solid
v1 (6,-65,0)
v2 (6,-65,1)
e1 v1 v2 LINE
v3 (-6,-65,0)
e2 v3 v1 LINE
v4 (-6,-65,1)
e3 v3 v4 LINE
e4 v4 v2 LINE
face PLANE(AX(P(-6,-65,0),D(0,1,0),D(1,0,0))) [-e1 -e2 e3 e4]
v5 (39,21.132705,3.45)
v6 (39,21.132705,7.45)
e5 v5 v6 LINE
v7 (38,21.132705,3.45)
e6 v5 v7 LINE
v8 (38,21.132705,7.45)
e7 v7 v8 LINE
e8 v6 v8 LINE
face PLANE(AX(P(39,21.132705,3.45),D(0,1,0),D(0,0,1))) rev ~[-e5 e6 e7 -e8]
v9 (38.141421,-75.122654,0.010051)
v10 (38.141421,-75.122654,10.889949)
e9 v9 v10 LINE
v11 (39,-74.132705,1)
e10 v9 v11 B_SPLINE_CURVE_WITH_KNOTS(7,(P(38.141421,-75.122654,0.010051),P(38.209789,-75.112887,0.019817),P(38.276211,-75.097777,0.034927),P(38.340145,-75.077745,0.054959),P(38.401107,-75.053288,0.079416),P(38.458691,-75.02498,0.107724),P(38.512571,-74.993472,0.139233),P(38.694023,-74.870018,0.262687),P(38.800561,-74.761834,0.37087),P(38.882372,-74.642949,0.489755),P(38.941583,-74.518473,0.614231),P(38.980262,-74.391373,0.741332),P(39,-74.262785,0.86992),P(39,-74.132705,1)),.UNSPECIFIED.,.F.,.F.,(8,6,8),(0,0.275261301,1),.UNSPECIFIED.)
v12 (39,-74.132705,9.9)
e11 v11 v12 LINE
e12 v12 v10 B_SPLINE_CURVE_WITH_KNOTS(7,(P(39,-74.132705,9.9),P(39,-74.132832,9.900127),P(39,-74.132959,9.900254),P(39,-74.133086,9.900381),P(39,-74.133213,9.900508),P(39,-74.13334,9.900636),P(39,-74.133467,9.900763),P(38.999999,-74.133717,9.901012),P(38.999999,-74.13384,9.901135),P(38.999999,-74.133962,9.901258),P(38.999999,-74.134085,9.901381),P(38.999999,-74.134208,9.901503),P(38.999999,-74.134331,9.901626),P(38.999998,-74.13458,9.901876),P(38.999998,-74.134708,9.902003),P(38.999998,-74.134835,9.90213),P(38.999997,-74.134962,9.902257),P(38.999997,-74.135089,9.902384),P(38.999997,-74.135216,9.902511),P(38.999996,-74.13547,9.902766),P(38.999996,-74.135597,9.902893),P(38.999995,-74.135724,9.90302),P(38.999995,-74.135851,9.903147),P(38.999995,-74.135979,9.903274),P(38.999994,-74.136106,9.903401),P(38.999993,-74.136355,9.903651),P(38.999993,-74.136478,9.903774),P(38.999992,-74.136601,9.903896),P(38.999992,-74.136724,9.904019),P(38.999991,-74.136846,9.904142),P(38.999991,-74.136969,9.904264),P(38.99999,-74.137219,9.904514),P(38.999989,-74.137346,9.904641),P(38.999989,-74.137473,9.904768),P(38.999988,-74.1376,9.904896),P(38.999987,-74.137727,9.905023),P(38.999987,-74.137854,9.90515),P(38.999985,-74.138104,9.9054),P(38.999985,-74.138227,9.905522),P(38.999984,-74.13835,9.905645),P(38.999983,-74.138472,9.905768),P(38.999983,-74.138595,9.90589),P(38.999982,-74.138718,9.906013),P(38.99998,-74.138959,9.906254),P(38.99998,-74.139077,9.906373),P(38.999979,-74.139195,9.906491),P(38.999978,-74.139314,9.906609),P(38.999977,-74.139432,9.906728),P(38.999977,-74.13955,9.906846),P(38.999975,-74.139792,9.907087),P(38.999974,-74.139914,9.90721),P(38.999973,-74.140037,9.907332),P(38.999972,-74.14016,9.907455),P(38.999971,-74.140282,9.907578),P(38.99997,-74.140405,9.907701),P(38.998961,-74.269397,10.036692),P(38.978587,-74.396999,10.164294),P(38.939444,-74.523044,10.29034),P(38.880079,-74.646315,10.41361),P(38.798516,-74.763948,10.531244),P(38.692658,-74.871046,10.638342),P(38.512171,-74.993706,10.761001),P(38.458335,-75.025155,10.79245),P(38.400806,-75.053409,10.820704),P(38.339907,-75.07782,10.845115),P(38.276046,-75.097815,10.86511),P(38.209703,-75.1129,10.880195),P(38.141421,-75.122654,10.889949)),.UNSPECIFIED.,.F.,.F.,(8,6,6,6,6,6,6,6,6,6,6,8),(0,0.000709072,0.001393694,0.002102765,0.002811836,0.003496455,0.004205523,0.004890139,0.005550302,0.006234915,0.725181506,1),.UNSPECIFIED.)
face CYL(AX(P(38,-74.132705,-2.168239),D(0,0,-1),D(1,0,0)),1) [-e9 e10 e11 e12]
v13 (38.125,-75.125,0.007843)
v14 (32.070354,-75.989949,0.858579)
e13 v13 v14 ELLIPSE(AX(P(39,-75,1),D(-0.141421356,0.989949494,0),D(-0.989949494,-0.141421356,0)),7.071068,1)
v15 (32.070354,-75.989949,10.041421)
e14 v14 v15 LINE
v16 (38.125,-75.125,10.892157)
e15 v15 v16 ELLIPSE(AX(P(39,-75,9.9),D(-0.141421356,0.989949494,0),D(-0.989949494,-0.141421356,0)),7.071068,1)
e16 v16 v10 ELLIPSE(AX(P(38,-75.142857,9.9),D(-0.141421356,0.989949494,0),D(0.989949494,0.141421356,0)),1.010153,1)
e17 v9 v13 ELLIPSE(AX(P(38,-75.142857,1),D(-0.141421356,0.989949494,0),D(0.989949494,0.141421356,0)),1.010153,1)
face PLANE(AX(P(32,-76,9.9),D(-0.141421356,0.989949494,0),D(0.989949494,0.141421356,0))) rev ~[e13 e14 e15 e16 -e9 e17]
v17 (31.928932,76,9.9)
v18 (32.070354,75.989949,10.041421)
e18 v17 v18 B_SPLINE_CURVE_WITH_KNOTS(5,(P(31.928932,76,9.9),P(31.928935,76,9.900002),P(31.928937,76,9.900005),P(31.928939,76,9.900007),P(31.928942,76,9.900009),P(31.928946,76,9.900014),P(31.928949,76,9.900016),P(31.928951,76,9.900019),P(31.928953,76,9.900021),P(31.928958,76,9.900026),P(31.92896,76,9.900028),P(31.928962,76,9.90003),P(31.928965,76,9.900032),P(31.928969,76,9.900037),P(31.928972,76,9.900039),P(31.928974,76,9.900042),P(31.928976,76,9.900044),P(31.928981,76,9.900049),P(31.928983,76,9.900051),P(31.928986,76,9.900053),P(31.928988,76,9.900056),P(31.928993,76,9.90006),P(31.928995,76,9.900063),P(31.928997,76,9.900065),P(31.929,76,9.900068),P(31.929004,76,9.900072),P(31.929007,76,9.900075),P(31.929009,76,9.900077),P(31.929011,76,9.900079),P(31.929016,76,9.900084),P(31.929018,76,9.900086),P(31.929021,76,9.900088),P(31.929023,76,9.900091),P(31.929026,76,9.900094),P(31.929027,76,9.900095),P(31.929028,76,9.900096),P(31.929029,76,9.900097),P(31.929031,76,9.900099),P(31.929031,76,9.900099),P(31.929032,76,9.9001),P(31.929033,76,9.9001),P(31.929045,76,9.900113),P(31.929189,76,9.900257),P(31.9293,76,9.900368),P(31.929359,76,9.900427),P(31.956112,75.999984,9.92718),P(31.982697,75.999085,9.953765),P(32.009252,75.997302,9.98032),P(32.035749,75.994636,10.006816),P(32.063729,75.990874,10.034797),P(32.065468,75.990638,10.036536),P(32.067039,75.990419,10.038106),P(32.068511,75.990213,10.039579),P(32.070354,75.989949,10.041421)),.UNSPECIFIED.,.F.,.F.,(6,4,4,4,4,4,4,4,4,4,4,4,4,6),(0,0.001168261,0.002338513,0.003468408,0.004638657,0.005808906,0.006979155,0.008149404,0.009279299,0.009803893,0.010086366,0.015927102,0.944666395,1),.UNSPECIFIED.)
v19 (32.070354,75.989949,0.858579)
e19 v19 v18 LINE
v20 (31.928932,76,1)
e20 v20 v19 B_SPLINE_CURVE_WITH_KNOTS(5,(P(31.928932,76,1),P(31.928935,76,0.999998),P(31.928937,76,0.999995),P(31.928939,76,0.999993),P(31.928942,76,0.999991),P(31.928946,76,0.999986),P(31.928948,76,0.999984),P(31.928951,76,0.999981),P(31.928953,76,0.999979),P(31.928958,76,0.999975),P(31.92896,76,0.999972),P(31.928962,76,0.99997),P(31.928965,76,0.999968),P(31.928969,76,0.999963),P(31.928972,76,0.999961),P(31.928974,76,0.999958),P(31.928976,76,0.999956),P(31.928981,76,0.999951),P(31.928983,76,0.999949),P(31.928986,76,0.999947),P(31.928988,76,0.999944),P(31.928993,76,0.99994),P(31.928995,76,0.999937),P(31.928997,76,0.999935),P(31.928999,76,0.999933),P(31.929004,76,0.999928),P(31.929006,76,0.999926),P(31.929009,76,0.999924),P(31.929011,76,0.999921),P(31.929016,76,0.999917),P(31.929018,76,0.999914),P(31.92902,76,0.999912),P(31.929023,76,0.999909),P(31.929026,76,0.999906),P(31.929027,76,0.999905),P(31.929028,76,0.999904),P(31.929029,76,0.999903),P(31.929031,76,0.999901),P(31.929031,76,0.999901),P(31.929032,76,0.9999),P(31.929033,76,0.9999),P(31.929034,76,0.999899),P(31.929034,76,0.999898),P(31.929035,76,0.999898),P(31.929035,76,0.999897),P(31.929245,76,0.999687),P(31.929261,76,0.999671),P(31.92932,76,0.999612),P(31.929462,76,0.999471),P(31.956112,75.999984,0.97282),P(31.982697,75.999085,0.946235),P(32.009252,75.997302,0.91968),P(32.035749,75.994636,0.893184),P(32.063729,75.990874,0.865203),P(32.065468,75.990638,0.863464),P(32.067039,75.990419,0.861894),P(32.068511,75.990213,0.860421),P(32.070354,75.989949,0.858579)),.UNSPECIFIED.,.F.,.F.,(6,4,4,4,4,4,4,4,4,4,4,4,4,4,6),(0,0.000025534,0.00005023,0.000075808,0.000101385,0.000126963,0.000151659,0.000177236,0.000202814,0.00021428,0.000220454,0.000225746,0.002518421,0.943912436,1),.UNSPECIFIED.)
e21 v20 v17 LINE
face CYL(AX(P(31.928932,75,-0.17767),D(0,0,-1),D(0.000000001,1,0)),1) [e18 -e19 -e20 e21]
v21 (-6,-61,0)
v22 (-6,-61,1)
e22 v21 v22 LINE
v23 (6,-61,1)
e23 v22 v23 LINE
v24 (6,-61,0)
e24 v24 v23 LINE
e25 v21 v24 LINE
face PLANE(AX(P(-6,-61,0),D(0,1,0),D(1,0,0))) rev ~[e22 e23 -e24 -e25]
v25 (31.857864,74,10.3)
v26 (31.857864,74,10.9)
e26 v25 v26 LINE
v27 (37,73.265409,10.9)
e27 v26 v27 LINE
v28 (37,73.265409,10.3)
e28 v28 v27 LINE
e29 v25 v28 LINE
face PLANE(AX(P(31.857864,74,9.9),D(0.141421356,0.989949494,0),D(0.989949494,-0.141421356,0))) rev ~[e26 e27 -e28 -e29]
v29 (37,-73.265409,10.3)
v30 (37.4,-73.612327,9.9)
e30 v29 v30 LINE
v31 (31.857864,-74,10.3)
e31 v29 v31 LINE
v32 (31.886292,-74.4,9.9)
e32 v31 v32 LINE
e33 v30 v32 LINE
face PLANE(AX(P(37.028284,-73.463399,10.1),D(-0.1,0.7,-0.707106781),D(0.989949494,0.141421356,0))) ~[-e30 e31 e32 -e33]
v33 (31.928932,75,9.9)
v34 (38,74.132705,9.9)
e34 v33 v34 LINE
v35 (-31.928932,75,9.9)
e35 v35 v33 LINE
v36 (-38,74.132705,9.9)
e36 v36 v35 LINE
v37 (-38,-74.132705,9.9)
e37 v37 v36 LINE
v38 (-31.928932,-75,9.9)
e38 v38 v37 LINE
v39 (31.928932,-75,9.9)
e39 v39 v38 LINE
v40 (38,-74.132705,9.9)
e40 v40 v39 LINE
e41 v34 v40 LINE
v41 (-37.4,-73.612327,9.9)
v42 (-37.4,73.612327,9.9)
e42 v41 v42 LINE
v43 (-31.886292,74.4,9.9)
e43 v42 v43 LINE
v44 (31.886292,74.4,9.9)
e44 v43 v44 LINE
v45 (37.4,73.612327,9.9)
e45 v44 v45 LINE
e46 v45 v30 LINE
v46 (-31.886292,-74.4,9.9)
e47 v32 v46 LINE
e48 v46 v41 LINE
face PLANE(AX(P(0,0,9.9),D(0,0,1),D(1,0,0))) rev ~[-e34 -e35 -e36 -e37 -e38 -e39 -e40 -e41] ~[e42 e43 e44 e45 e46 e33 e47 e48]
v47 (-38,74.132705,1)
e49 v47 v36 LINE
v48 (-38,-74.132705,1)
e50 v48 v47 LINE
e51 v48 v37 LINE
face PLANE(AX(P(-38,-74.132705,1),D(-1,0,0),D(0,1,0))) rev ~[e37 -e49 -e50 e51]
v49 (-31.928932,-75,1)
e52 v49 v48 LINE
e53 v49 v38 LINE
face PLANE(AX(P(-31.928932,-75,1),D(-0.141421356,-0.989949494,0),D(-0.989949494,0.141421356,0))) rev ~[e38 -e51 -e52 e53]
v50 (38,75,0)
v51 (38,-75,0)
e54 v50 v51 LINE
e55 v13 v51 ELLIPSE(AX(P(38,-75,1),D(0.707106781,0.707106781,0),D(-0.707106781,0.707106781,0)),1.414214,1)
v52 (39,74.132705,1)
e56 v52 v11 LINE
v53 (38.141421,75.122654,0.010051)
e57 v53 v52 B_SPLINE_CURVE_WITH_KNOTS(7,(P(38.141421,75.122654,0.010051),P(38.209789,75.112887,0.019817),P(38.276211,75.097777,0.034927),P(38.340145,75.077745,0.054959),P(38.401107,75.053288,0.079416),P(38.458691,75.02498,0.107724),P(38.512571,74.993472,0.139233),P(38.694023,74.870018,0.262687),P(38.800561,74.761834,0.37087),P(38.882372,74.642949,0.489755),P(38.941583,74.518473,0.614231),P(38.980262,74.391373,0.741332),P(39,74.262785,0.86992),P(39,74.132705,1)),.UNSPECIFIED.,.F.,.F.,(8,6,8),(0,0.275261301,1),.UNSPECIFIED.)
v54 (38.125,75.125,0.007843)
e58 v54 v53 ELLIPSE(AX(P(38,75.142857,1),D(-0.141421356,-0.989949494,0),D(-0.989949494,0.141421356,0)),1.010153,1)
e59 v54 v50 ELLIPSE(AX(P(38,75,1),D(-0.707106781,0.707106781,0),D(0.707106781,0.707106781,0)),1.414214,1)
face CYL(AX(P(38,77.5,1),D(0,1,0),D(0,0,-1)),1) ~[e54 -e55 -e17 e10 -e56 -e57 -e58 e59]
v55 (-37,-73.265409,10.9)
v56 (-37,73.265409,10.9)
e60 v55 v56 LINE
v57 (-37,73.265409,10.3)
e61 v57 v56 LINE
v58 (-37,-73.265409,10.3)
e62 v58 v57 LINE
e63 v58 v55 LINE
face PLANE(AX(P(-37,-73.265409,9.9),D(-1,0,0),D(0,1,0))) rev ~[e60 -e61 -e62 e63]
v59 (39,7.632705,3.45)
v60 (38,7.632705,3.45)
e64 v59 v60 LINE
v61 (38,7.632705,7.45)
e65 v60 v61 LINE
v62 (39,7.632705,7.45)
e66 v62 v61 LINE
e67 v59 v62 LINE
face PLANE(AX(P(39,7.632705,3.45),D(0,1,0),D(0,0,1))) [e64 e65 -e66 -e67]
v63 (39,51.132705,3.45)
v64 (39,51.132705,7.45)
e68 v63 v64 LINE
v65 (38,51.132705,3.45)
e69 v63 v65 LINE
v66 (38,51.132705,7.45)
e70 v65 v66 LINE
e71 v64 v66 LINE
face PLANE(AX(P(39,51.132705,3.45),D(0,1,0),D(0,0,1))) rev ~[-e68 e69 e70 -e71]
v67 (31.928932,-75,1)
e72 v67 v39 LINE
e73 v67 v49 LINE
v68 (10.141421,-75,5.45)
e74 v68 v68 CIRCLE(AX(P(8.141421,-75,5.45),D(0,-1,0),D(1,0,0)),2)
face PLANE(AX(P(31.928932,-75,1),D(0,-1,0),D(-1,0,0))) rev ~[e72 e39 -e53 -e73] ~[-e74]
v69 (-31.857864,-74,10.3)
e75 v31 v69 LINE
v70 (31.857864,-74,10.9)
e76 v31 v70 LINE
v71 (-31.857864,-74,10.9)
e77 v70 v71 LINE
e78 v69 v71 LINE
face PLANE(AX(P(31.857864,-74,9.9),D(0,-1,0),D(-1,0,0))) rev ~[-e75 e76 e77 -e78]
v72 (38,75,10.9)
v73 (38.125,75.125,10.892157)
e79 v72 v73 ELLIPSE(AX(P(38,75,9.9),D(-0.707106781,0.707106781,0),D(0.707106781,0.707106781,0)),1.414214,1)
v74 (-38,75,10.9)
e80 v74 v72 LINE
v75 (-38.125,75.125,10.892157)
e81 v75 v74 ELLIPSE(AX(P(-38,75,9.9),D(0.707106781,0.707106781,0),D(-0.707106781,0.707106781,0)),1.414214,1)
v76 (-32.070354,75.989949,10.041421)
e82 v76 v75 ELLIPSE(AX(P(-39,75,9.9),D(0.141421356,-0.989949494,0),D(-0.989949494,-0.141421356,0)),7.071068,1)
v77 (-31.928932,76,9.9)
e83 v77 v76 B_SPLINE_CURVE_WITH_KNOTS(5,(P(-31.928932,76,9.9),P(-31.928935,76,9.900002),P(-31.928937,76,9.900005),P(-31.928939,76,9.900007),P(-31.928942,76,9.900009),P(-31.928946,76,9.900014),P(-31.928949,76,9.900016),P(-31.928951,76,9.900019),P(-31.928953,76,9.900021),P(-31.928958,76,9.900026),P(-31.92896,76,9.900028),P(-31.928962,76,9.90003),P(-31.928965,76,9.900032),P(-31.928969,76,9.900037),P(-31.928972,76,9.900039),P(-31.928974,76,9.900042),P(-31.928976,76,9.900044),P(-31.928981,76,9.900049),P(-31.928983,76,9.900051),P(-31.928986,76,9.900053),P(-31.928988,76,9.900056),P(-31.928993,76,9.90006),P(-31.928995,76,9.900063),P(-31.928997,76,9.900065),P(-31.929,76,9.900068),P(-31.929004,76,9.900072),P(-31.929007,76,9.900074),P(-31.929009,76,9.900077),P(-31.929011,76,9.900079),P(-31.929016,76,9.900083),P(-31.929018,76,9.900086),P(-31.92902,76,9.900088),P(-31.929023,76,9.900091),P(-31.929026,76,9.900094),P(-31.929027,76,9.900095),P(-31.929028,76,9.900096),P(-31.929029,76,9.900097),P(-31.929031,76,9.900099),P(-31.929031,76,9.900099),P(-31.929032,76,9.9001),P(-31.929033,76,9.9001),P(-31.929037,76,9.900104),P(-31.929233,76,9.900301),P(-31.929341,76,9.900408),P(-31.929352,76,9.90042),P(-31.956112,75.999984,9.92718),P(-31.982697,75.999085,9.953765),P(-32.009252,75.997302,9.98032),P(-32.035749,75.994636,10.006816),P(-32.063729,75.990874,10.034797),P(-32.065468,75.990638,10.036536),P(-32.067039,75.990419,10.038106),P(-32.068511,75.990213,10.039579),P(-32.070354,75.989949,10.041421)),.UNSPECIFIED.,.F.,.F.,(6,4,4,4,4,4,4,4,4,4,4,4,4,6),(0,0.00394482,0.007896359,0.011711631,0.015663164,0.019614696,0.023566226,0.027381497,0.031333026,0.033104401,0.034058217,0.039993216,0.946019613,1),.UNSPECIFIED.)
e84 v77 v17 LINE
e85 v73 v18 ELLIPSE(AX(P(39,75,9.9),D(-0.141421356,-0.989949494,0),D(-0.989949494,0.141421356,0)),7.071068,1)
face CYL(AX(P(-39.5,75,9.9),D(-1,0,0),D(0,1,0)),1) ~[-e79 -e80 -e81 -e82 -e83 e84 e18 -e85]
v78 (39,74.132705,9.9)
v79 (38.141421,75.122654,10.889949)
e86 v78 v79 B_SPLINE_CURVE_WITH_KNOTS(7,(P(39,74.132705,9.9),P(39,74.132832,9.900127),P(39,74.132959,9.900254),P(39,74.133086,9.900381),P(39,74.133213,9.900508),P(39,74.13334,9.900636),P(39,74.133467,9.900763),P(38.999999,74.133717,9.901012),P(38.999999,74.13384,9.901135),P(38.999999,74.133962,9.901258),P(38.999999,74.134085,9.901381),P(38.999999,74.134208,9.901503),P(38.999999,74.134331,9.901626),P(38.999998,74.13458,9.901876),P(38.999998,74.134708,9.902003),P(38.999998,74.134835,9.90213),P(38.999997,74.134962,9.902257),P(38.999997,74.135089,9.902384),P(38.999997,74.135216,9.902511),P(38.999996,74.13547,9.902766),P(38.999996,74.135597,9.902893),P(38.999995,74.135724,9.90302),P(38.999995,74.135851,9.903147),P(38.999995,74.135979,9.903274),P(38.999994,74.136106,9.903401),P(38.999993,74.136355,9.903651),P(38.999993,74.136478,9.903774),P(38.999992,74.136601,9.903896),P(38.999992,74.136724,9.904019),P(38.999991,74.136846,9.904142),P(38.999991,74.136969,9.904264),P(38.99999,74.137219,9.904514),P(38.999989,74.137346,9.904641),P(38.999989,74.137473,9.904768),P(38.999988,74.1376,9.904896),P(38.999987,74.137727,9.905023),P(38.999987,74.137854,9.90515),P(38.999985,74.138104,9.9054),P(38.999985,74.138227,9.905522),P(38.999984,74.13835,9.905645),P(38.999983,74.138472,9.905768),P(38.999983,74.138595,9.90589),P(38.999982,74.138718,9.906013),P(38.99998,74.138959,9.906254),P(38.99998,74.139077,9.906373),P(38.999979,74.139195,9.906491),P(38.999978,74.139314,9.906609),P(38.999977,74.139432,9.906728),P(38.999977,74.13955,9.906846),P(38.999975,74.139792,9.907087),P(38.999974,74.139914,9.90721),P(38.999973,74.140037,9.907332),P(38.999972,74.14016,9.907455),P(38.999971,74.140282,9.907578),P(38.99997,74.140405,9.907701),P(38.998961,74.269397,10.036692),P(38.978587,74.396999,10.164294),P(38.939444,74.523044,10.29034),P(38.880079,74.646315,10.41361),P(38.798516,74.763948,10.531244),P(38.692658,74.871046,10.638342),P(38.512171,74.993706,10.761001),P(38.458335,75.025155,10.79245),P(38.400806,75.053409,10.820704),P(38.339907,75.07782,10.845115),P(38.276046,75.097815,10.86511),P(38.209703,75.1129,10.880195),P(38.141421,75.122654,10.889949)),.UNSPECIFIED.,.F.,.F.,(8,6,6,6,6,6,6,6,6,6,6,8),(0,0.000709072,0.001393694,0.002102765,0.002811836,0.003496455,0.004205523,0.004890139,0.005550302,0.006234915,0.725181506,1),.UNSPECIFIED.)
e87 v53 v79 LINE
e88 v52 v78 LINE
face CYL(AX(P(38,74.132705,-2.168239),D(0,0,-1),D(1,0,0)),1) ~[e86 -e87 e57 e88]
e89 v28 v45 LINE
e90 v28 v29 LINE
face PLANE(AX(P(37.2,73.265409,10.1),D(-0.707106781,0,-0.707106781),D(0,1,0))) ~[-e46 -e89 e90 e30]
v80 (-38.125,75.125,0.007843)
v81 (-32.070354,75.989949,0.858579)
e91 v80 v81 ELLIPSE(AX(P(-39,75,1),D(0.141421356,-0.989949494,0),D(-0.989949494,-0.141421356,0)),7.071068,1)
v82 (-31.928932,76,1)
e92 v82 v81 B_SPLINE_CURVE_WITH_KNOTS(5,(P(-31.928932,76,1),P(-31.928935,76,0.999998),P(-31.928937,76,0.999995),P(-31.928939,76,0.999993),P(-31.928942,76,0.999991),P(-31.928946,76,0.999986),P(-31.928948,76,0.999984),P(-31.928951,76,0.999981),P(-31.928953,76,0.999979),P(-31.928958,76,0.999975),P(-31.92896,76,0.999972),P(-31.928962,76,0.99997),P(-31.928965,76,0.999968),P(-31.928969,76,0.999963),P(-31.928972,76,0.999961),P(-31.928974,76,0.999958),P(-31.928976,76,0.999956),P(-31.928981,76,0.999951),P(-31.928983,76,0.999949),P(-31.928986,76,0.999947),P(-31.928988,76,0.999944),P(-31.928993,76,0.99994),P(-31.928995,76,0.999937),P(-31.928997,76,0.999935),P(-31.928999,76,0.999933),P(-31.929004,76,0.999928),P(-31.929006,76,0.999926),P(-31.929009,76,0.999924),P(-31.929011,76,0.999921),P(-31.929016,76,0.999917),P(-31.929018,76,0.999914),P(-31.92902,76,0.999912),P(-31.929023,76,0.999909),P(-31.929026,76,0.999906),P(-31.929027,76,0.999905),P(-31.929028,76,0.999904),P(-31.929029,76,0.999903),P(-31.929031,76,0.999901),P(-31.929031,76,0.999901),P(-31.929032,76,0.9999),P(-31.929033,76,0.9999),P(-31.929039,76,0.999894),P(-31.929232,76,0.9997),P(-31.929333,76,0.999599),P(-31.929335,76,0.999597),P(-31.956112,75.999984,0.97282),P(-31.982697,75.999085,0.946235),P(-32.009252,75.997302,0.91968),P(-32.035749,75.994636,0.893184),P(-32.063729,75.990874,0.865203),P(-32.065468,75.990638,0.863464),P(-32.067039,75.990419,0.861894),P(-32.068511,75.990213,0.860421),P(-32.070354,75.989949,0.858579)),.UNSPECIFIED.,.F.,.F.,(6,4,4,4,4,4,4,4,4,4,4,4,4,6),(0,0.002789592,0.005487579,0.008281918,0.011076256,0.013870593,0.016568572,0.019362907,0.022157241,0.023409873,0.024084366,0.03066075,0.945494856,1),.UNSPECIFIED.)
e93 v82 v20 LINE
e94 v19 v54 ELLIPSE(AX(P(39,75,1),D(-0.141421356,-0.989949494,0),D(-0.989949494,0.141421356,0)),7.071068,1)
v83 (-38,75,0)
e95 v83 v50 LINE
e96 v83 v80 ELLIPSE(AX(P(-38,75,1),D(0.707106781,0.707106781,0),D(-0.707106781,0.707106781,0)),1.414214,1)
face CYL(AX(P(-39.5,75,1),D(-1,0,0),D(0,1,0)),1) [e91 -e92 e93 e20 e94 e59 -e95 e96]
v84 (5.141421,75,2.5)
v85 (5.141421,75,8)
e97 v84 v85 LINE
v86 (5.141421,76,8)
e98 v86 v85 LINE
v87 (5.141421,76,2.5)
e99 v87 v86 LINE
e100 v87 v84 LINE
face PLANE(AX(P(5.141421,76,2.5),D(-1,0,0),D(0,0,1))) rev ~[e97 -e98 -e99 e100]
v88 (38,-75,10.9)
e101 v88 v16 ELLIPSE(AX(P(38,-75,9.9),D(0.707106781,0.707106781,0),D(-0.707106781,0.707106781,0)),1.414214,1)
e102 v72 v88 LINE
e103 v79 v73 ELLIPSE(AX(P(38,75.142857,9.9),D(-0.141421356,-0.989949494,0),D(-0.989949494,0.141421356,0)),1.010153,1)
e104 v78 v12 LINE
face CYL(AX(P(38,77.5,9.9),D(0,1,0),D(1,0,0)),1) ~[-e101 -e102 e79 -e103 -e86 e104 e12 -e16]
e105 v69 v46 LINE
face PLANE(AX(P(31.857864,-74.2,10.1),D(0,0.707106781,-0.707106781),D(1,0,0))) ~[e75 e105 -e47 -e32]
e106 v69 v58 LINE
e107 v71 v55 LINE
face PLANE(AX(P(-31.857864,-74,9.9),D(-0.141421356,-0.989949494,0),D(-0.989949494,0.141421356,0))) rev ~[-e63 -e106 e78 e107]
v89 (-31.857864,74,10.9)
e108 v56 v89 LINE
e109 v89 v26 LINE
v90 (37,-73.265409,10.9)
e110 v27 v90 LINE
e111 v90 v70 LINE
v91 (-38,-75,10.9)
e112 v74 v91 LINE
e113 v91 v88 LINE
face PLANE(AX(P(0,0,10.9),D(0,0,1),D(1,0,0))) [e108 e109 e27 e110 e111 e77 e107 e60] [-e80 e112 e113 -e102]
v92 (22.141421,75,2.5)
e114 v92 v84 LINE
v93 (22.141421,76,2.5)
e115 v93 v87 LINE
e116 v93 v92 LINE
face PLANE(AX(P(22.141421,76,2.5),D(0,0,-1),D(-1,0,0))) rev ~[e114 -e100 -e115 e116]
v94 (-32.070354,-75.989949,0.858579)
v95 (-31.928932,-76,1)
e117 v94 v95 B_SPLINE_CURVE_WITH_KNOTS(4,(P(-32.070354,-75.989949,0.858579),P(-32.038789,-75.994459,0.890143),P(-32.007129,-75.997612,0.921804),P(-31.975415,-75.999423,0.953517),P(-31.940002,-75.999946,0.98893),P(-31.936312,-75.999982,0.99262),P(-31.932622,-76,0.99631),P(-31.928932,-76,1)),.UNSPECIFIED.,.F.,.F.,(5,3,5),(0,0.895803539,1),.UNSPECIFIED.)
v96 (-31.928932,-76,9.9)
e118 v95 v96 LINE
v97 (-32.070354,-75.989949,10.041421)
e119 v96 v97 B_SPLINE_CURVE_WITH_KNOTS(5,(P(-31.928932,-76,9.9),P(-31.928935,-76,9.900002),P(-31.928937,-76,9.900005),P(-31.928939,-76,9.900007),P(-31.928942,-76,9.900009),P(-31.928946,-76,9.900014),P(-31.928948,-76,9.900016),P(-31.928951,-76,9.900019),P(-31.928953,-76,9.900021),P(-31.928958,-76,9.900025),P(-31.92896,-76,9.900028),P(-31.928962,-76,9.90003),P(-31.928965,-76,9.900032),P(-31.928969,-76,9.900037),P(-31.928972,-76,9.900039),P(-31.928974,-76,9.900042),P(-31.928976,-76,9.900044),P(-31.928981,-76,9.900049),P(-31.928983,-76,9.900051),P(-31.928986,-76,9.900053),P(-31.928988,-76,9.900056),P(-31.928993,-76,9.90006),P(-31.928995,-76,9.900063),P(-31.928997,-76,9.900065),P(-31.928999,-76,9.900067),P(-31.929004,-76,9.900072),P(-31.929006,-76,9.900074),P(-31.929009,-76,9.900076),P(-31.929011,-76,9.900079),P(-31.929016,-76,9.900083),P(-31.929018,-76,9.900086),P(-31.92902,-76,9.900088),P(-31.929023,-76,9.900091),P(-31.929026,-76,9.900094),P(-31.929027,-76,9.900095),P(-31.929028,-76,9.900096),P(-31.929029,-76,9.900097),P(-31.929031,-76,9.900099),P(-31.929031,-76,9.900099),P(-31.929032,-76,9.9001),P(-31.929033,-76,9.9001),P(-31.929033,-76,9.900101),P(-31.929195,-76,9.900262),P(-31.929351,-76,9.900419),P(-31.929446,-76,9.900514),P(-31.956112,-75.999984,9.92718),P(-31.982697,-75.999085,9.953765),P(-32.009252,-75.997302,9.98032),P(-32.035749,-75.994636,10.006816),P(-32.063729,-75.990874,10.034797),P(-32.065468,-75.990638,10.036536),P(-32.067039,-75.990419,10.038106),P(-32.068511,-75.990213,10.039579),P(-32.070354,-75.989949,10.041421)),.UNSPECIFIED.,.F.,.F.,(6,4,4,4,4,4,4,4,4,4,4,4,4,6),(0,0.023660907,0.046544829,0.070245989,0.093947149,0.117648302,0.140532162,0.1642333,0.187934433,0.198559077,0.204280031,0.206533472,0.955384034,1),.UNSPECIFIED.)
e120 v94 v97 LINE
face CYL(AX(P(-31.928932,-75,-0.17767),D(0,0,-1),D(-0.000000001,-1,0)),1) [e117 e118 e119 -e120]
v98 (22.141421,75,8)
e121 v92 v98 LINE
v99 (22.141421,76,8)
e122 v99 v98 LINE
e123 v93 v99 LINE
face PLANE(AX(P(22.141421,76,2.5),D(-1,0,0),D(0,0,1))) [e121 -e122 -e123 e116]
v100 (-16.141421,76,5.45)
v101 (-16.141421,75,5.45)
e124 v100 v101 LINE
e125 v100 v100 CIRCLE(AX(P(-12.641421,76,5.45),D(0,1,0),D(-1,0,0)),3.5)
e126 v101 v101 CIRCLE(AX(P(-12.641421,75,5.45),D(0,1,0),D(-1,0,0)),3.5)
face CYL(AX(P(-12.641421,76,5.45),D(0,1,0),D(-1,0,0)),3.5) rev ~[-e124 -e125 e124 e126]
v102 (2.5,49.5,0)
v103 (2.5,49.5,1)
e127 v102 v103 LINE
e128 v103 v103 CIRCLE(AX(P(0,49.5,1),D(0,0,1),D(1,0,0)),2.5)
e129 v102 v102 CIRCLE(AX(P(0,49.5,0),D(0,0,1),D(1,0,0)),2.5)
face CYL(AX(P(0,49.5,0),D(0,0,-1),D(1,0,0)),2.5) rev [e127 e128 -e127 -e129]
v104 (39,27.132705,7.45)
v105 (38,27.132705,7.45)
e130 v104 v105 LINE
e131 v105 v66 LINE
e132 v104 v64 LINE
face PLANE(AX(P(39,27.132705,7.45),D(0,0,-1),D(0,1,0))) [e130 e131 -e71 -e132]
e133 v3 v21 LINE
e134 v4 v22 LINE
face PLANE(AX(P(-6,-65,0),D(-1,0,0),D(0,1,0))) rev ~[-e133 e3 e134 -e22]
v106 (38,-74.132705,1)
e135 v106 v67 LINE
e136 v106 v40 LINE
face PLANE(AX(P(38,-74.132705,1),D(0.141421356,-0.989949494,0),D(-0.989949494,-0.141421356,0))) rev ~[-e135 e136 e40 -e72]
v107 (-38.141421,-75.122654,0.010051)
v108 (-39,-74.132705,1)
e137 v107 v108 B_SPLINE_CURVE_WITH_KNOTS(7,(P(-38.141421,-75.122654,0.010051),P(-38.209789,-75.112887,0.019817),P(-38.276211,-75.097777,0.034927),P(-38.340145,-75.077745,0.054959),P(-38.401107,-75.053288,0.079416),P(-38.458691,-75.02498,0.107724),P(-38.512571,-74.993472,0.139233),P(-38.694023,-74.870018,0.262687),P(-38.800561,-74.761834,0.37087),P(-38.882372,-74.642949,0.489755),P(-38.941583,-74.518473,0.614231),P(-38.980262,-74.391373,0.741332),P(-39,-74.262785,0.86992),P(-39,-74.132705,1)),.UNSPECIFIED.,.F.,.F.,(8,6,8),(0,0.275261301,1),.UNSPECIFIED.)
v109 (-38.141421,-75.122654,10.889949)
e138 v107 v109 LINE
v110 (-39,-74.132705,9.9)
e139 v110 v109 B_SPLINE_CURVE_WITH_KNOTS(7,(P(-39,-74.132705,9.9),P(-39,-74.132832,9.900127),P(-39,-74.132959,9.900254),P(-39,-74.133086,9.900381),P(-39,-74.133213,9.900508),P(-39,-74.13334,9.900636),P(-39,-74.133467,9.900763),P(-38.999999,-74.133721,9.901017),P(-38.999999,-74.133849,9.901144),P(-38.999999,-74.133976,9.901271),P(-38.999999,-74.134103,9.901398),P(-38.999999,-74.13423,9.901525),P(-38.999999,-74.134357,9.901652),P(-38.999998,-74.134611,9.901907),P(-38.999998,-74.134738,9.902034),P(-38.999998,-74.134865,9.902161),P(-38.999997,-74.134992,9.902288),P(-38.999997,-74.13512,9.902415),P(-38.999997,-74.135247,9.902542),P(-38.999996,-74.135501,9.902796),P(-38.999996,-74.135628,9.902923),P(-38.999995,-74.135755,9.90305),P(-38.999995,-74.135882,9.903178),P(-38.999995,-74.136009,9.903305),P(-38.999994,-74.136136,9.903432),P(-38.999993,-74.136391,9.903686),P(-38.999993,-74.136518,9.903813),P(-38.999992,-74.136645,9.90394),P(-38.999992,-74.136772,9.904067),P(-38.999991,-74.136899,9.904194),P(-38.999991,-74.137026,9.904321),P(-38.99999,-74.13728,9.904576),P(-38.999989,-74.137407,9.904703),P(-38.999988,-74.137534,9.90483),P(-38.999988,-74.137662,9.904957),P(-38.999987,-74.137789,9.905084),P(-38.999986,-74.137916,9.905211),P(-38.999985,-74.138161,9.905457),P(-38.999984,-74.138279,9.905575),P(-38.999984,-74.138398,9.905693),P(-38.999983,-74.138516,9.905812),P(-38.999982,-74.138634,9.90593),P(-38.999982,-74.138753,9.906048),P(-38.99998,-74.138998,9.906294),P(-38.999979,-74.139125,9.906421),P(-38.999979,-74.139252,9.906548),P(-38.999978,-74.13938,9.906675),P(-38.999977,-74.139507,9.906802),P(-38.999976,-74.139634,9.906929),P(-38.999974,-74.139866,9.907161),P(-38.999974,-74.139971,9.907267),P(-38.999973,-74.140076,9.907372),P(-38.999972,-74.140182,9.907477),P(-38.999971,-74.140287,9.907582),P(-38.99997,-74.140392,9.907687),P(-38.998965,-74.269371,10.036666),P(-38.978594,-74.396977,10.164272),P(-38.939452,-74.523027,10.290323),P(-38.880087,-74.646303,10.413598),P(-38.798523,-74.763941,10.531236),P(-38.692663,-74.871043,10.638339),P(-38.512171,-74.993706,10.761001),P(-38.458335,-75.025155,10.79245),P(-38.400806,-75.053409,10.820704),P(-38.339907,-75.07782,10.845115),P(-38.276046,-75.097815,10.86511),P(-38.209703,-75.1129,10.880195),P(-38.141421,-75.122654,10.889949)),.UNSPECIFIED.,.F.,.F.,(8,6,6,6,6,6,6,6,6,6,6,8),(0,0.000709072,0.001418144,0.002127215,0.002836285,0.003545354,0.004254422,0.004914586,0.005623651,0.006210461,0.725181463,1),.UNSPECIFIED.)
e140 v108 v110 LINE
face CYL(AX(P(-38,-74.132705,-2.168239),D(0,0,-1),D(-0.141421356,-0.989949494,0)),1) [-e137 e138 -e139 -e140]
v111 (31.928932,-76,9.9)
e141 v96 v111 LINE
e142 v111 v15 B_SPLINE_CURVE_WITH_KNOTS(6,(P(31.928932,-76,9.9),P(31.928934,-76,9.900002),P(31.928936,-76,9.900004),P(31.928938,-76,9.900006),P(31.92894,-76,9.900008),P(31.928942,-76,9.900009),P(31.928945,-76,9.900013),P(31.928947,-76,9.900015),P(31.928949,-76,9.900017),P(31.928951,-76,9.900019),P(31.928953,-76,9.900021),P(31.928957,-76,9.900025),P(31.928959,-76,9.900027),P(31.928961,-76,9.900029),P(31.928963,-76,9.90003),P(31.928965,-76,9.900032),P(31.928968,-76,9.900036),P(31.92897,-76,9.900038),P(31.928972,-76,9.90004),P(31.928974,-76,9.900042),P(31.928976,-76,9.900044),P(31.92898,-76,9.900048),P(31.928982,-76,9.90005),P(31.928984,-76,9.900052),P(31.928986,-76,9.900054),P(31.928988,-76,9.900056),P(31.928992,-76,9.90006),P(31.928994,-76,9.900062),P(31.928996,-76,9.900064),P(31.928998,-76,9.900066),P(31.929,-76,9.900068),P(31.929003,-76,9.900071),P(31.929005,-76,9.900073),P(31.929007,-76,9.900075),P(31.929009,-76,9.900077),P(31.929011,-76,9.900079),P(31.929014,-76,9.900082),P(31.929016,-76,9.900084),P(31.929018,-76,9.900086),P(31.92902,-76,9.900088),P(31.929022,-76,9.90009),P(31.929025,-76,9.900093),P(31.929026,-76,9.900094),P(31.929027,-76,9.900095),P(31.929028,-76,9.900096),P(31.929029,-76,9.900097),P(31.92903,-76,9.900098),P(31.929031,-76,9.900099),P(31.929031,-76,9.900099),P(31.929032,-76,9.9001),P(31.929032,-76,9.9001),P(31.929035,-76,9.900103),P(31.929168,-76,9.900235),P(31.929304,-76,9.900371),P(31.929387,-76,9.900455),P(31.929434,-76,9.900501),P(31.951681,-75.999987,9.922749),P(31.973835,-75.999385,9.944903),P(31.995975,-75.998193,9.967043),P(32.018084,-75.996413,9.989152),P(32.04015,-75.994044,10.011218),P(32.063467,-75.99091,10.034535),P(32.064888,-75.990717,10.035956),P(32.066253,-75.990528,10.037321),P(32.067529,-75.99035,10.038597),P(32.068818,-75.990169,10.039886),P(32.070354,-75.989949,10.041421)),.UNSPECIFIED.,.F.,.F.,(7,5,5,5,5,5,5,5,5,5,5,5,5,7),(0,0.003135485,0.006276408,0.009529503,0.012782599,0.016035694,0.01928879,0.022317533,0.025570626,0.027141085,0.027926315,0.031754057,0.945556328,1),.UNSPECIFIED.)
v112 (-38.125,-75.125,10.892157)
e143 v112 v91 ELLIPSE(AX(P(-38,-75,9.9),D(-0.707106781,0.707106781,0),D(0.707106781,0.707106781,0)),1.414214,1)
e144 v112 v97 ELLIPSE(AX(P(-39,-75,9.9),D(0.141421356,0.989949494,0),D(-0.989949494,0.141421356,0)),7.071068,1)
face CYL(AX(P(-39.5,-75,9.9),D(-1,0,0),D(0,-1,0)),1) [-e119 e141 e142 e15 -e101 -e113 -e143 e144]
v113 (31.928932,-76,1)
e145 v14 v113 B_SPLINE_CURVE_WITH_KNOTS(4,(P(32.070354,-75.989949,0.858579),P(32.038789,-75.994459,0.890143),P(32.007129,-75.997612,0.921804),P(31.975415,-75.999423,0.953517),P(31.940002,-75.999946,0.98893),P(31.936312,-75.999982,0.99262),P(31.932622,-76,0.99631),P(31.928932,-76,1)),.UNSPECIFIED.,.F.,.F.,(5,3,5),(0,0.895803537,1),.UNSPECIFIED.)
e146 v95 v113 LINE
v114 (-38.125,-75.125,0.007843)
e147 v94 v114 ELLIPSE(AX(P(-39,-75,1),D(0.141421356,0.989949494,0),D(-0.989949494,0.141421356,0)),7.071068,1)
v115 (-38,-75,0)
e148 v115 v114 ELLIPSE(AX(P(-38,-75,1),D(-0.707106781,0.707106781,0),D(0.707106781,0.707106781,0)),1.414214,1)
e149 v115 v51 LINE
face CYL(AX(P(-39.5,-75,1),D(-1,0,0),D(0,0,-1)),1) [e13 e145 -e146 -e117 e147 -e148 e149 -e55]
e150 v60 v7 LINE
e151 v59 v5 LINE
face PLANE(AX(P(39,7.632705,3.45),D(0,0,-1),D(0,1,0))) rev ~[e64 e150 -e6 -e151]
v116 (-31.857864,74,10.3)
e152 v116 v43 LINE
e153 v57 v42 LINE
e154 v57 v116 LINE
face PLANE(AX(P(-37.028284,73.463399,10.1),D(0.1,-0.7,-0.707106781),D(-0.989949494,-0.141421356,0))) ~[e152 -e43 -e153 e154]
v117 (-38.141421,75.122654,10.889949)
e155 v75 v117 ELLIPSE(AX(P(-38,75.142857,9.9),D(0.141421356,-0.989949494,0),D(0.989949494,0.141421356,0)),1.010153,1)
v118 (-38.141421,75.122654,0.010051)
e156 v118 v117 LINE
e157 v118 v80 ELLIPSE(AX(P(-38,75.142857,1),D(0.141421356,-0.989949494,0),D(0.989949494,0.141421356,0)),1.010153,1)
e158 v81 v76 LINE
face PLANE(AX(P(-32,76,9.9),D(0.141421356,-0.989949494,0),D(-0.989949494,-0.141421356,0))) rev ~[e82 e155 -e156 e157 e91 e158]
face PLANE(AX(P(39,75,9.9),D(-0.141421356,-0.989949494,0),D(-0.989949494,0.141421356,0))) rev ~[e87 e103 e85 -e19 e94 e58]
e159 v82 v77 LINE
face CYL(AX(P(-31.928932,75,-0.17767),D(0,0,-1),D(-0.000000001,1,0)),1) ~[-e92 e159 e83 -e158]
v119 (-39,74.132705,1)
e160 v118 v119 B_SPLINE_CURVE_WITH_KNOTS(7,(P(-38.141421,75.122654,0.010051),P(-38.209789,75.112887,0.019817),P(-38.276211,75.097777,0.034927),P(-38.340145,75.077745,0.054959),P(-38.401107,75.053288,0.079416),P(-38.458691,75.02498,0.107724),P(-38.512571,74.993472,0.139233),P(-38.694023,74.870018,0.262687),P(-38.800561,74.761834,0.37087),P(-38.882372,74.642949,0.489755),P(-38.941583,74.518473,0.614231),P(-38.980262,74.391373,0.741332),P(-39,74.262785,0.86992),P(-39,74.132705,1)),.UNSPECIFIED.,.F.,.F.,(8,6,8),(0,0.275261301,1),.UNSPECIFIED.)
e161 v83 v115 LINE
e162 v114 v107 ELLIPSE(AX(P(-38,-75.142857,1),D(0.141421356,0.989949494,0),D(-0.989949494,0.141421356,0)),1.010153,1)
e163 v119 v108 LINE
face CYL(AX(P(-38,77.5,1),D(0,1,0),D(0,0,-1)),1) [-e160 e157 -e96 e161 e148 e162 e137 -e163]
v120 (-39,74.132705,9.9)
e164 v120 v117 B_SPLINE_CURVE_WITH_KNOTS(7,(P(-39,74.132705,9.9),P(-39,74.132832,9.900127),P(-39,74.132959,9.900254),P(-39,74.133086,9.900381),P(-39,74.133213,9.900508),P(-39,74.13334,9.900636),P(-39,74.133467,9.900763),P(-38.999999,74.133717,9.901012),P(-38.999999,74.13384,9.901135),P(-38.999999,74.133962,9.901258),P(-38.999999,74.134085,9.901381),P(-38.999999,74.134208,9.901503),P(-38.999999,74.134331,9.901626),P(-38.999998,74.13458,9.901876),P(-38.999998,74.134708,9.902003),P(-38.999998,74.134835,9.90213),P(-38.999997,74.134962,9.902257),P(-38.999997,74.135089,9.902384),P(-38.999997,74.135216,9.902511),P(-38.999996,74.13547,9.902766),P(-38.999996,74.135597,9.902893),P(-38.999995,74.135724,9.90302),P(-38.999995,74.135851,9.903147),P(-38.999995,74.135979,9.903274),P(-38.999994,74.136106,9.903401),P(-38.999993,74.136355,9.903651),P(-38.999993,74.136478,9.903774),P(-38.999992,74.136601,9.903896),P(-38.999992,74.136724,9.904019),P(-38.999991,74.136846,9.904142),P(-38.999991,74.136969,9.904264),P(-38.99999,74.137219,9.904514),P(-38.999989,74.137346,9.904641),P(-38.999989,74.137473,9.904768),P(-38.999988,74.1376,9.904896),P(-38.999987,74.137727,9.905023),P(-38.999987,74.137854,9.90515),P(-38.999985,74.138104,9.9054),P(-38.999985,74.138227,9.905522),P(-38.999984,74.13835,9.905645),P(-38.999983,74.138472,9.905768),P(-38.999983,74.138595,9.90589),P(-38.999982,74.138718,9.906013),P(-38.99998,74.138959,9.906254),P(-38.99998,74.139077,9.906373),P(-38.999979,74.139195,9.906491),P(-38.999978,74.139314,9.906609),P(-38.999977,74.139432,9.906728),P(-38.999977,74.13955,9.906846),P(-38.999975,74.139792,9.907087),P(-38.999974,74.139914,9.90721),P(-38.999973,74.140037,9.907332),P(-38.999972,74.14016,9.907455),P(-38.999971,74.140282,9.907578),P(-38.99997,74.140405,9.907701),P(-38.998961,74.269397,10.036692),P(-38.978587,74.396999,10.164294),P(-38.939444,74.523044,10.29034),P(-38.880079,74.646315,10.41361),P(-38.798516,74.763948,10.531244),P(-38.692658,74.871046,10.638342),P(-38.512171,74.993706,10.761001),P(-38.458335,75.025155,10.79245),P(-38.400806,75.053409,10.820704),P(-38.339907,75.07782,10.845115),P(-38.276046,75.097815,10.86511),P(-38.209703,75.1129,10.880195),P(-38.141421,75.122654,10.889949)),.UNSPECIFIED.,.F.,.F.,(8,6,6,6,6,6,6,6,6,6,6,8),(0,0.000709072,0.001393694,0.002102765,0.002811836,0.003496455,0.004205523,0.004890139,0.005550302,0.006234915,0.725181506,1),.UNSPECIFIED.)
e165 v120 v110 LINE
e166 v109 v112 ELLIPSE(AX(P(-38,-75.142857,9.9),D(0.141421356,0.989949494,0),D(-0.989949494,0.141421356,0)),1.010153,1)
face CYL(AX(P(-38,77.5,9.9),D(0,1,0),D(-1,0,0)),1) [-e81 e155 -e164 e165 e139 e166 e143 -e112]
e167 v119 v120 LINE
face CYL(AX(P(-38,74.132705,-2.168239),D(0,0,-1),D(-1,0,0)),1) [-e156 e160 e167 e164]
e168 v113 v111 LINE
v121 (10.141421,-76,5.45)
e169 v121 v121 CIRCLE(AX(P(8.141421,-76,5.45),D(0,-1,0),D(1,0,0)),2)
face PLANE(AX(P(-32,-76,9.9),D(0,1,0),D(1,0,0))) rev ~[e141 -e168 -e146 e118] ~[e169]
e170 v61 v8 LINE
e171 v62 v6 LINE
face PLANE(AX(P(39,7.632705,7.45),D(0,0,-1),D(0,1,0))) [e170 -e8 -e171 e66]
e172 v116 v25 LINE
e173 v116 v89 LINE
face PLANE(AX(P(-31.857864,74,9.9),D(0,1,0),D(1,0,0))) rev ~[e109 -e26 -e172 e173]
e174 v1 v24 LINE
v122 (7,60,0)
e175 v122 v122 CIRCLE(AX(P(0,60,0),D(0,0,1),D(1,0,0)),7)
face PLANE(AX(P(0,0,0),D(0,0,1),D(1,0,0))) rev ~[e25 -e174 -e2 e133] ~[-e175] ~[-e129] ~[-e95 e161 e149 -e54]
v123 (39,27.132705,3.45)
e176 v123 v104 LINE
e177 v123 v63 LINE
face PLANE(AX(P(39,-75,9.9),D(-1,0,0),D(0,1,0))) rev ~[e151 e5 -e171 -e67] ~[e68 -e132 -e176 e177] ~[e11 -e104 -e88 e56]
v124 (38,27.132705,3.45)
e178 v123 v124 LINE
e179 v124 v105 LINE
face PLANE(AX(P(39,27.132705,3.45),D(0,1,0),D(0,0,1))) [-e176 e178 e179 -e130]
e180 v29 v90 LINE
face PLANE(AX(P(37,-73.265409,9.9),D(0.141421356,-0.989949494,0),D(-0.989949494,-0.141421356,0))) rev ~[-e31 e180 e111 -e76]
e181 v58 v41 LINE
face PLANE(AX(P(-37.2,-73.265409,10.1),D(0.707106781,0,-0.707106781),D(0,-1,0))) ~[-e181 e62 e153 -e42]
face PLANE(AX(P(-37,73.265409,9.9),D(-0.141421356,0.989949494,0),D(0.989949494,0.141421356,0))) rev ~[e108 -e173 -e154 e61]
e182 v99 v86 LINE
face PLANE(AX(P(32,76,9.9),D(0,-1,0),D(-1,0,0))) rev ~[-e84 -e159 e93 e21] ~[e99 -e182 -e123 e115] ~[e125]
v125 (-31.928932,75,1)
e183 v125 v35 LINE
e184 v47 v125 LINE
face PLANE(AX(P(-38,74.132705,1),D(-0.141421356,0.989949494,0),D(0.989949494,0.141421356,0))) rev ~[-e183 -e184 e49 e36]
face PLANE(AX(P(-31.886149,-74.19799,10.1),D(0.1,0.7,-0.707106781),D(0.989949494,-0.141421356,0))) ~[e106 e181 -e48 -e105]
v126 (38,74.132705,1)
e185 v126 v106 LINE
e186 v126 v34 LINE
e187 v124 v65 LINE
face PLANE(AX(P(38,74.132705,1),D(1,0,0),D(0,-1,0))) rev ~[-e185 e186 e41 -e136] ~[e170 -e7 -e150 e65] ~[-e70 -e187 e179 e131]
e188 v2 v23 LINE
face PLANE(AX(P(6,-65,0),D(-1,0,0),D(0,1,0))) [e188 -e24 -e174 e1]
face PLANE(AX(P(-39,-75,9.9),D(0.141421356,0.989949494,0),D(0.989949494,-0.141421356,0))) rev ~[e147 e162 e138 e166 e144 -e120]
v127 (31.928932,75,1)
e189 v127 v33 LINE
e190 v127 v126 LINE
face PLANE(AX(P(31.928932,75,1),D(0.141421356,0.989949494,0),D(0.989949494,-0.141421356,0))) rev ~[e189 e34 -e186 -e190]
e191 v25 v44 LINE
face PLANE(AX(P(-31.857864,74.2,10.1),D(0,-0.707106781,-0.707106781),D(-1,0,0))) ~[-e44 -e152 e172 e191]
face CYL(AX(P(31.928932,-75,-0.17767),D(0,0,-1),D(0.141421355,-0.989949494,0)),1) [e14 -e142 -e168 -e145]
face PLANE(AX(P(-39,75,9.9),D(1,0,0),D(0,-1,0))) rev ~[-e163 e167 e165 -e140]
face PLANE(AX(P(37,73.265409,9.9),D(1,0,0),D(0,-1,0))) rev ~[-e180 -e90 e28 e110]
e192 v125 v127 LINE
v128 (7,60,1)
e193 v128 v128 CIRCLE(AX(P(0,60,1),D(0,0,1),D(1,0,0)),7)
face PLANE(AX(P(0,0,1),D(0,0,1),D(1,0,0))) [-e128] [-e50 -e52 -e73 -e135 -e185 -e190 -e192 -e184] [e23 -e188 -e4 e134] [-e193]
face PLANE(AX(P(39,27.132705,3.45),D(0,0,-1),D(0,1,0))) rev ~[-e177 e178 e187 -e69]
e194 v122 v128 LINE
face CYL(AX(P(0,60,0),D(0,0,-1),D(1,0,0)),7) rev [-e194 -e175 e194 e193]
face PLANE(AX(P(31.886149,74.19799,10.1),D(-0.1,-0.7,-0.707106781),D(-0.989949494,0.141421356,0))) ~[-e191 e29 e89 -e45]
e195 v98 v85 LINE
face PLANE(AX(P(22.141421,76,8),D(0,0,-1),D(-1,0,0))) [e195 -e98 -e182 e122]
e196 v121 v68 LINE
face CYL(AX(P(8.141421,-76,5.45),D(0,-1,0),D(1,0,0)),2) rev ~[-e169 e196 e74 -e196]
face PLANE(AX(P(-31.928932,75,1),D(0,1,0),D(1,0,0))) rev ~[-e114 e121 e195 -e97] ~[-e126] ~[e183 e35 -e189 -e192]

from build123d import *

# Parameters (mm, degrees)
F0_W        = 12
F0_H        = 4
F0_R        = 2.5
F0_R_2      = 7
F1_DEPTH    = 1
F3_DEPTH    = 8.9
F5_DEPTH    = 1
F6_T1_DEPTH = 155
F6_T3_DEPTH = 79
F6_T5_DEPTH = 11.2553390593
F6_T7_DEPTH = 15.2364770085
F7_SIZE     = 0.4
F8_W        = 13.5
F8_H        = 4
F8_W_2      = 24
F9_DEPTH    = 25
F10_R       = 3.5
F10_W       = 17
F10_H       = 5.5
F11_DEPTH   = 25
F12_R       = 2
F13_DEPTH   = 25


# Not quite as in the source:
# - a fillet or chamfer that OpenCascade refuses, or shapes differently, is made with other operations: its cross-section is extruded or revolved along the edge and cut away or added
# - a feature names something its author has since deleted; it is built from what else it names


with BuildPart() as f1:
    # F0 (on Top) → F1 (new body)
    with BuildSketch(Plane.XY):
        Polygon((32, 76), (-32, 76), (-39, 75), (-39, -75), (-32, -76), (32, -76), (39, -75), (39, 75), align=None)
        with Locations((0, -63)):
            Rectangle(F0_W, F0_H, mode=Mode.SUBTRACT)
        with Locations((0, 49.5)):
            Circle(F0_R, mode=Mode.SUBTRACT)
        with Locations((0, 60)):
            Circle(F0_R_2, mode=Mode.SUBTRACT)
    extrude(amount=F1_DEPTH)

    # F2 (on face) → F3 (join)
    with BuildSketch(Plane.XY.offset(1)):
        Polygon((39, 75), (32, 76), (-32, 76), (-39, 75), (-39, -75), (-32, -76), (32, -76), (39, -75), align=None)
        Polygon((31.9289321881, -75), (-31.9289321881, -75), (-38, -74.1327045983), (-38, 74.1327045983), (-31.9289321881, 75), (31.9289321881, 75), (38, 74.1327045983), (38, -74.1327045983), align=None, mode=Mode.SUBTRACT)
    extrude(amount=F3_DEPTH)

    # F4 (on face) → F5 (join)
    with BuildSketch(Plane.XY.offset(9.9)):
        Polygon((39, -75), (39, 75), (32, 76), (-32, 76), (-39, 75), (-39, -75), (-32, -76), (32, -76), align=None)
        Polygon((38, -74.1327045983), (31.9289321881, -75), (-31.9289321881, -75), (-38, -74.1327045983), (-38, 74.1327045983), (-31.9289321881, 75), (31.9289321881, 75), (38, 74.1327045983), align=None, mode=Mode.SUBTRACT)
        Polygon((-31.9289321881, -75), (31.9289321881, -75), (38, -74.1327045983), (38, 74.1327045983), (31.9289321881, 75), (-31.9289321881, 75), (-38, 74.1327045983), (-38, -74.1327045983), align=None)
        Polygon((-37, 73.2654091966), (-31.8578643763, 74), (31.8578643763, 74), (37, 73.2654091966), (37, -73.2654091966), (31.8578643763, -74), (-31.8578643763, -74), (-37, -73.2654091966), align=None, mode=Mode.SUBTRACT)
    extrude(amount=F5_DEPTH)

    # F6: fillet of radius 1 on 16 edges, made by hand

    # F6_s2 → F6_t1 (cut)
    with BuildSketch(Plane.XZ.offset(-77.5)):
        with BuildLine():
            ThreePointArc((-39, 9.9), (-38.7071067812, 10.6071067812), (-38, 10.9))
            Line((-38, 10.9), (-39, 10.9))
            Line((-39, 10.9), (-39, 9.9))
        make_face()
        with BuildLine():
            ThreePointArc((39, 9.9), (38.7071067812, 10.6071067812), (38, 10.9))
            Line((38, 10.9), (39, 10.9))
            Line((39, 10.9), (39, 9.9))
        make_face()
        with BuildLine():
            ThreePointArc((38, 0), (38.7071067812, 0.2928932188), (39, 1))
            Line((39, 1), (39, 0))
            Line((39, 0), (38, 0))
        make_face()
        with BuildLine():
            ThreePointArc((-38, 0), (-38.7071067812, 0.2928932188), (-39, 1))
            Line((-39, 1), (-39, 0))
            Line((-39, 0), (-38, 0))
        make_face()
    extrude(amount=F6_T1_DEPTH, mode=Mode.SUBTRACT)

    # F6_s4 → F6_t3 (cut)
    with BuildSketch(Plane.YZ.offset(-39.5)):
        with BuildLine():
            ThreePointArc((76, 9.9), (75.7071067812, 10.6071067812), (75, 10.9))
            Line((75, 10.9), (76, 10.9))
            Line((76, 10.9), (76, 9.9))
        make_face()
        with BuildLine():
            ThreePointArc((-76, 9.9), (-75.7071067812, 10.6071067812), (-75, 10.9))
            Line((-75, 10.9), (-76, 10.9))
            Line((-76, 10.9), (-76, 9.9))
        make_face()
        with BuildLine():
            ThreePointArc((-75, 0), (-75.7071067812, 0.2928932188), (-76, 1))
            Line((-76, 1), (-76, 0))
            Line((-76, 0), (-75, 0))
        make_face()
        with BuildLine():
            ThreePointArc((76, 1), (75.7071067812, 0.2928932188), (75, 0))
            Line((75, 0), (76, 0))
            Line((76, 0), (76, 1))
        make_face()
    extrude(amount=F6_T3_DEPTH, mode=Mode.SUBTRACT)

    # F6_s6 → F6_t5 (cut)
    with BuildSketch(Plane.XY.offset(-0.1776695297)):
        with BuildLine():
            ThreePointArc((31.9289321881, 76), (31.9998212082, 75.9974842088), (32.0703535444, 75.9899494937))
            Line((32.0703535444, 75.9899494937), (32, 76))
            Line((32, 76), (31.9289321881, 76))
        make_face()
        with BuildLine():
            ThreePointArc((-31.9289321881, 76), (-31.9998212082, 75.9974842088), (-32.0703535444, 75.9899494937))
            Line((-32.0703535444, 75.9899494937), (-32, 76))
            Line((-32, 76), (-31.9289321881, 76))
        make_face()
        with BuildLine():
            ThreePointArc((32.0703535444, -75.9899494937), (31.9998212082, -75.9974842088), (31.9289321881, -76))
            Line((31.9289321881, -76), (32, -76))
            Line((32, -76), (32.0703535444, -75.9899494937))
        make_face()
        with BuildLine():
            ThreePointArc((-31.9289321881, -76), (-31.9998212082, -75.9974842088), (-32.0703535444, -75.9899494937))
            Line((-32.0703535444, -75.9899494937), (-32, -76))
            Line((-32, -76), (-31.9289321881, -76))
        make_face()
    extrude(amount=F6_T5_DEPTH, mode=Mode.SUBTRACT)

    # F6_s8 → F6_t7 (cut)
    with BuildSketch(Plane.XY.offset(-2.1682385042)):
        with BuildLine():
            ThreePointArc((39, -74.1327045983), (38.755453955, -74.7879063397), (38.1414213562, -75.122654092))
            Line((38.1414213562, -75.122654092), (39, -75))
            Line((39, -75), (39, -74.1327045983))
        make_face()
        with BuildLine():
            ThreePointArc((39, 74.1327045983), (38.755453955, 74.7879063397), (38.1414213562, 75.122654092))
            Line((38.1414213562, 75.122654092), (39, 75))
            Line((39, 75), (39, 74.1327045983))
        make_face()
        with BuildLine():
            ThreePointArc((-38.1414213562, -75.122654092), (-38.755453955, -74.7879063397), (-39, -74.1327045983))
            Line((-39, -74.1327045983), (-39, -75))
            Line((-39, -75), (-38.1414213562, -75.122654092))
        make_face()
        with BuildLine():
            ThreePointArc((-39, 74.1327045983), (-38.755453955, 74.7879063397), (-38.1414213562, 75.122654092))
            Line((-38.1414213562, 75.122654092), (-39, 75))
            Line((-39, 75), (-39, 74.1327045983))
        make_face()
    extrude(amount=F6_T7_DEPTH, mode=Mode.SUBTRACT)

    # F7
    f7_edges = [f1.edges().sort_by_distance(p)[0] for p in [
        (-34.428932, 73.632705, 9.9),
        (-37, 0, 9.9),
        (0, 74, 9.9),
        (34.428932, 73.632705, 9.9),
        (37, 0, 9.9),
        (34.428932, -73.632705, 9.9),
        (0, -74, 9.9),
        (-34.428932, -73.632705, 9.9),
    ]]
    chamfer(f7_edges, length=F7_SIZE)

    # F8 (on face) → F9 (cut)
    with BuildSketch(Plane.YZ.offset(39)):
        with Locations((14.3827045983, 5.45)):
            Rectangle(F8_W, F8_H)
        with Locations((39.1327045983, 5.45)):
            Rectangle(F8_W_2, F8_H)
    extrude(amount=-F9_DEPTH, mode=Mode.SUBTRACT)

    # F10 (on face) → F11 (cut)
    with BuildSketch(Plane(origin=(0, 76, 0), x_dir=(-1, 0, 0), z_dir=(0, 1, 0))):
        with Locations((12.6414213562, 5.45)):
            Circle(F10_R)
        with Locations((-13.6414213562, 5.25)):
            Rectangle(F10_W, F10_H)
    extrude(amount=-F11_DEPTH, mode=Mode.SUBTRACT)

    # F12 (on face) → F13 (cut)
    with BuildSketch(Plane.XZ.offset(76)):
        with Locations((8.1414213562, 5.45)):
            Circle(F12_R)
    extrude(amount=-F13_DEPTH, mode=Mode.SUBTRACT)


solid = f1.part
